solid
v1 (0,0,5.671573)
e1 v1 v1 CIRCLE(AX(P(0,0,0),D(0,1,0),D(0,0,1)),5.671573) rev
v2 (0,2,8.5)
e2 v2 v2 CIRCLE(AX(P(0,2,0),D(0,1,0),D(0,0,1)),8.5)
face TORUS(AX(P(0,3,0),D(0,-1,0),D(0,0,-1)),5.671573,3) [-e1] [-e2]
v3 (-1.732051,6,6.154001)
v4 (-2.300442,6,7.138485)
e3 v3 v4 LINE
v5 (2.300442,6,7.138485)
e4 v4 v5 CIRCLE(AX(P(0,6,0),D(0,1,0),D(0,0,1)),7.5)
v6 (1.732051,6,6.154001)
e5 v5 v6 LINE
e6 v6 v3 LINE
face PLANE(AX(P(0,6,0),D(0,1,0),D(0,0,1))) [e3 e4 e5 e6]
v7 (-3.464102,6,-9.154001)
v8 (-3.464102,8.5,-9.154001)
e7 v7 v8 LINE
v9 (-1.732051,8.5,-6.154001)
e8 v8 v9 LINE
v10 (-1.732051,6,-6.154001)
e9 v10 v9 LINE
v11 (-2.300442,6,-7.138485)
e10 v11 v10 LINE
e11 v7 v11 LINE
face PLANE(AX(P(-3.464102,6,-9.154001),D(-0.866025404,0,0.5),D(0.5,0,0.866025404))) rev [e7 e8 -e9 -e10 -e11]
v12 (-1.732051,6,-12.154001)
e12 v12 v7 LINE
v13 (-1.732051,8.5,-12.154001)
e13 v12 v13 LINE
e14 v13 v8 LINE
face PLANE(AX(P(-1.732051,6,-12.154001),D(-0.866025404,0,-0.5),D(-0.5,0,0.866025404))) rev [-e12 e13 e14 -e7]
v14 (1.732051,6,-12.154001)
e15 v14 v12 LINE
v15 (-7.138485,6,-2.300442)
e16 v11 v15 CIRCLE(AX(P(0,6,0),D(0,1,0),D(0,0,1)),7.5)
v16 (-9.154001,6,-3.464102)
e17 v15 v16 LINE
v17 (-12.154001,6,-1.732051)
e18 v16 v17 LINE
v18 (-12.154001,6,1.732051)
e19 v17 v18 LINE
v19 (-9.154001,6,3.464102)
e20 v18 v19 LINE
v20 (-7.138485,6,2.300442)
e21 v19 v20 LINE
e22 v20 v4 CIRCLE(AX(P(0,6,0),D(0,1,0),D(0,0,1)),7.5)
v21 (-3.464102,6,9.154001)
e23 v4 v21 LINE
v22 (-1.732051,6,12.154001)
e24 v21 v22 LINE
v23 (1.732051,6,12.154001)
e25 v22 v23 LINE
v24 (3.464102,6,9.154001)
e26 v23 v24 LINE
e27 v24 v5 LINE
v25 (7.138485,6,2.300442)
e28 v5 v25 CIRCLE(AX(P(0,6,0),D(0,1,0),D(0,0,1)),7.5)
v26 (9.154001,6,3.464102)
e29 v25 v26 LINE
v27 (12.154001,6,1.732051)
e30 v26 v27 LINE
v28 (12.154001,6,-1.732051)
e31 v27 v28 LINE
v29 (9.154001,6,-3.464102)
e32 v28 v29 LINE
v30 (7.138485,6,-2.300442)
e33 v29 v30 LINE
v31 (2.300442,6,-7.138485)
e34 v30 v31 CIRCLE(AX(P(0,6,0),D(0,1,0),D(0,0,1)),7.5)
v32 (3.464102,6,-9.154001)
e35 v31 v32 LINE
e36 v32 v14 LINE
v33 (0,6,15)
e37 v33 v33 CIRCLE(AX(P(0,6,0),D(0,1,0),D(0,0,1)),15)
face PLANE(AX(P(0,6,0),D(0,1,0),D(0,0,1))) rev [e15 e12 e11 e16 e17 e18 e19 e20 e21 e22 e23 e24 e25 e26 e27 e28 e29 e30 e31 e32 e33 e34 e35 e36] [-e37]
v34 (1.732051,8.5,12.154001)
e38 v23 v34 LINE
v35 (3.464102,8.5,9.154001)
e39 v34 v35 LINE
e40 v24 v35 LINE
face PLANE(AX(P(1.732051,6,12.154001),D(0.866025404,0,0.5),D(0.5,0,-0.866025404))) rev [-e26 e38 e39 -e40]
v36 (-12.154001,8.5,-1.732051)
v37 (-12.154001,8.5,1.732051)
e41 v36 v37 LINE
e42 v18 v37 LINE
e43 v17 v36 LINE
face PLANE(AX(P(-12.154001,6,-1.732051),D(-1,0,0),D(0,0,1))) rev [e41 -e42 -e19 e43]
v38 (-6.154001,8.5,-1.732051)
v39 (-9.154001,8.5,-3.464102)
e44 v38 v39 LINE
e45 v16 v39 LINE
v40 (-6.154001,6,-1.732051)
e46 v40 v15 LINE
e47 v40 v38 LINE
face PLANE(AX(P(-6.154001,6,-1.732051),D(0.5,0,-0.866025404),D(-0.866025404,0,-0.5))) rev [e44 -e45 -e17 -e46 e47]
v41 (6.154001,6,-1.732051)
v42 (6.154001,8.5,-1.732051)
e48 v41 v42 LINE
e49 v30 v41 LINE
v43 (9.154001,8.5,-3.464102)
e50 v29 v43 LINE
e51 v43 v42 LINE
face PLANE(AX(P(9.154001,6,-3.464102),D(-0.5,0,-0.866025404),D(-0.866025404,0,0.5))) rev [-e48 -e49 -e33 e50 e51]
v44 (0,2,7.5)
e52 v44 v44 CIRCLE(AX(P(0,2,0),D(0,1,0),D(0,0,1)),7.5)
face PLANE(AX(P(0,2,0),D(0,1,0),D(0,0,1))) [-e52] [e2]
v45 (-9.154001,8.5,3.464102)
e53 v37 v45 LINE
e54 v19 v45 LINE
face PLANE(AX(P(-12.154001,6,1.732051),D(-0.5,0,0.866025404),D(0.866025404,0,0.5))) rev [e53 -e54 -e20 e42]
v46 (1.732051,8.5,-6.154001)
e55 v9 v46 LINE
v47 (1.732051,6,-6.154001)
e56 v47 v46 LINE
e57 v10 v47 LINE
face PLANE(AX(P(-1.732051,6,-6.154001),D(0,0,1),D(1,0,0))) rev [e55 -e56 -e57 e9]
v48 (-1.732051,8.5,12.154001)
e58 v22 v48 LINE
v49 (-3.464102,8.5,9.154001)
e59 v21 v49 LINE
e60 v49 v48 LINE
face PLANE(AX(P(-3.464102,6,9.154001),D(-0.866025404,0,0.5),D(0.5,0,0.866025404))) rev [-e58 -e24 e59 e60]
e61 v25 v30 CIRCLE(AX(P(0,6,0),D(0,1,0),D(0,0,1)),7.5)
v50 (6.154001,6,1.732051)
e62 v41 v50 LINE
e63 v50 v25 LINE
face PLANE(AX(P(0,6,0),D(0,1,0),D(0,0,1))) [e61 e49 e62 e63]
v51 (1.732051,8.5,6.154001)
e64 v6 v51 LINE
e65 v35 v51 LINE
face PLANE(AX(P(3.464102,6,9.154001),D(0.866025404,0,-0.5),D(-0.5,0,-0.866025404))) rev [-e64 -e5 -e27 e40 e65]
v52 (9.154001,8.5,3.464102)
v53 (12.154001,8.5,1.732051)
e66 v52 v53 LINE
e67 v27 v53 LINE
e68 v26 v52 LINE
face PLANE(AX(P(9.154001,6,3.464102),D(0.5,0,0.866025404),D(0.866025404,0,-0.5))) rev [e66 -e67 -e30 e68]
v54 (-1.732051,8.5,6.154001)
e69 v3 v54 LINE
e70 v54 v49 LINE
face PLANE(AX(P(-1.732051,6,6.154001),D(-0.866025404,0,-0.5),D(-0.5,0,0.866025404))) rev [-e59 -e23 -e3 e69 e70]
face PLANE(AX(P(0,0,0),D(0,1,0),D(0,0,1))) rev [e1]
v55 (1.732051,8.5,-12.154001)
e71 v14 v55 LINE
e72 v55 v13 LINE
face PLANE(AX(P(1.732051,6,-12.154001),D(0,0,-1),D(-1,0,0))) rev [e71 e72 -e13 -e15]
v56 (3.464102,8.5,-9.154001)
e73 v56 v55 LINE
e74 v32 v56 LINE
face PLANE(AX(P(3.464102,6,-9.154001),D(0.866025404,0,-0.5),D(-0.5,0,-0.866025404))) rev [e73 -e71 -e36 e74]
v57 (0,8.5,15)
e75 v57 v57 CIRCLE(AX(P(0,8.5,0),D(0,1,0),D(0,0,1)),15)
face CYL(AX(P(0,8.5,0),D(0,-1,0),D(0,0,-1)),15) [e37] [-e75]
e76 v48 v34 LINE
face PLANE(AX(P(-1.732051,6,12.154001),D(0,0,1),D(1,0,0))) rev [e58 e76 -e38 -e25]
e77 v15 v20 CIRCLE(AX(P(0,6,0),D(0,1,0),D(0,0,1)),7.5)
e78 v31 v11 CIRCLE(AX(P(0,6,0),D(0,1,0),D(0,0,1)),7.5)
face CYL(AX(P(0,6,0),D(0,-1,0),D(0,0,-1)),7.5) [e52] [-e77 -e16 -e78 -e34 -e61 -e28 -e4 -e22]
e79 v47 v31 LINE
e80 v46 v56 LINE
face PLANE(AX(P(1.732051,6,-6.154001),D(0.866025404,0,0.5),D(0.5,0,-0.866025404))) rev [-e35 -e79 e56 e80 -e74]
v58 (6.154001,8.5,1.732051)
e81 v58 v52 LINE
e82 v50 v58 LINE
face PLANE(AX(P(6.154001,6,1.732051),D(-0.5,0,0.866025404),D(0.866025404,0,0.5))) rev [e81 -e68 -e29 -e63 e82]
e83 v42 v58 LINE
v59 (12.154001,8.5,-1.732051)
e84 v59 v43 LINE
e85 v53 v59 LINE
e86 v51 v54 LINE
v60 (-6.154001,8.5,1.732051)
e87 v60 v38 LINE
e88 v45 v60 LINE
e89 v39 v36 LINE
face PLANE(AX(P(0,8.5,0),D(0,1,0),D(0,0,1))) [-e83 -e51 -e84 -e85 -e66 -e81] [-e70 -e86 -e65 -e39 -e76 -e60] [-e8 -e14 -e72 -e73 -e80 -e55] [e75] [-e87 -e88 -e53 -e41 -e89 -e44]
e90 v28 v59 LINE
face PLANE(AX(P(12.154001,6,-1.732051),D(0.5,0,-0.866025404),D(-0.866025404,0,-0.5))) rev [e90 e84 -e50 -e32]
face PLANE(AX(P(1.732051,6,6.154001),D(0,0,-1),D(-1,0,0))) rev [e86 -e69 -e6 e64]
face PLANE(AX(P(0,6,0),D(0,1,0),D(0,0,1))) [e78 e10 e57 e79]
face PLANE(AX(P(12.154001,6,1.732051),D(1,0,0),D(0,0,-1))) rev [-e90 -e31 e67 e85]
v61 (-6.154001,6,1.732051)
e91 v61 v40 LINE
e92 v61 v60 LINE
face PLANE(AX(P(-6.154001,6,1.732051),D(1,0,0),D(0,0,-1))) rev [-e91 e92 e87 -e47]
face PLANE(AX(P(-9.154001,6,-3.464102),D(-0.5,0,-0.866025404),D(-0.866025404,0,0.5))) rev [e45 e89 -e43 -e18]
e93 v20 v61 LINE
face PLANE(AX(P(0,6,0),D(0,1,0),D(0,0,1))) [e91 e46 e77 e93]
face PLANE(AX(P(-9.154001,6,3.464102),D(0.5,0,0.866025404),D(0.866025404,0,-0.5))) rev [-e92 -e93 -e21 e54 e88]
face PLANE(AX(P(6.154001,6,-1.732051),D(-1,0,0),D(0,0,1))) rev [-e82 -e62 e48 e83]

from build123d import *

# Parameters (mm, degrees)
CROQUIS1_R              = 8.5
SALIENTE_EXTRUIR1_DEPTH = 2
CROQUIS2_R              = 7.5
SALIENTE_EXTRUIR2_DEPTH = 4
CROQUIS3_R              = 15
SALIENTE_EXTRUIR3_DEPTH = 2.5
REDONDEO1_R             = 3
CORTAR_EXTRUIR1_DEPTH   = 2.5


with BuildPart() as part:
    # Croquis1 → Saliente-Extruir1 (new body)
    with BuildSketch(Plane(origin=(0, 0, 0), x_dir=(1, 0, 0), z_dir=(0, 1, 0))):
        with Locations(Location((0, 0, 0), (0, 0, 270))):
            Circle(CROQUIS1_R)
    extrude(amount=SALIENTE_EXTRUIR1_DEPTH)

    # Croquis2 → Saliente-Extruir2 (add)
    with BuildSketch(Plane(origin=(0, 2, 0), x_dir=(1, 0, 0), z_dir=(0, 1, 0))):
        with Locations(Location((0, 0, 0), (0, 0, 270))):
            Circle(CROQUIS2_R)
    extrude(amount=SALIENTE_EXTRUIR2_DEPTH)

    # Croquis3 → Saliente-Extruir3 (add)
    with BuildSketch(Plane(origin=(0, 6, 0), x_dir=(1, 0, 0), z_dir=(0, 1, 0))):
        with Locations(Location((0, 0, 0), (0, 0, 270))):
            Circle(CROQUIS3_R)
    extrude(amount=SALIENTE_EXTRUIR3_DEPTH)

    # Redondeo1
    # the kernel refuses this fillet: 3 mm, written as the material it takes off along each edge
    with BuildSketch(Plane(origin=(0, 0, 0), x_dir=(0, 0, 1), z_dir=(-1, 0, 0))) as redondeo1_piece_1:
        with BuildLine():
            CenterArc((5.671572875, 3), REDONDEO1_R, 270, 70.528779366)
            Line((5.671572875, 0), (5.671572875, -0.06))
            Line((5.671572875, -0.06), (8.5, -0.06))
            Line((8.5, -0.06), (8.56, 0))
            ThreePointArc((8.56, 0), (8.56, 1), (8.556568542, 1.98))
            Line((8.556568542, 1.98), (8.5, 2))
        make_face()
    revolve(axis=Axis((0, 0, 0), (0, 1, 0)), mode=Mode.SUBTRACT)

    # Croquis4 → Cortar-Extruir1 (cut)
    with BuildSketch(Plane(origin=(0, 8.5, 0), x_dir=(1, 0, 0), z_dir=(0, 1, 0))):
        Polygon((12.154001459, -1.732050808), (12.154001459, 1.732050808), (9.154001459, 3.464101615), (6.154001459, 1.732050808), (6.154001459, -1.732050808), (9.154001459, -3.464101615), align=None)
        Polygon((3.464101615, 9.154001459), (1.732050808, 12.154001459), (-1.732050808, 12.154001459), (-3.464101615, 9.154001459), (-1.732050808, 6.154001459), (1.732050808, 6.154001459), align=None)
        Polygon((-1.732050808, -12.154001459), (1.732050808, -12.154001459), (3.464101615, -9.154001459), (1.732050808, -6.154001459), (-1.732050808, -6.154001459), (-3.464101615, -9.154001459), align=None)
        Polygon((-12.154001459, 1.732050808), (-12.154001459, -1.732050808), (-9.154001459, -3.464101615), (-6.154001459, -1.732050808), (-6.154001459, 1.732050808), (-9.154001459, 3.464101615), align=None)
    extrude(amount=-CORTAR_EXTRUIR1_DEPTH, mode=Mode.SUBTRACT)


solid = part.part
